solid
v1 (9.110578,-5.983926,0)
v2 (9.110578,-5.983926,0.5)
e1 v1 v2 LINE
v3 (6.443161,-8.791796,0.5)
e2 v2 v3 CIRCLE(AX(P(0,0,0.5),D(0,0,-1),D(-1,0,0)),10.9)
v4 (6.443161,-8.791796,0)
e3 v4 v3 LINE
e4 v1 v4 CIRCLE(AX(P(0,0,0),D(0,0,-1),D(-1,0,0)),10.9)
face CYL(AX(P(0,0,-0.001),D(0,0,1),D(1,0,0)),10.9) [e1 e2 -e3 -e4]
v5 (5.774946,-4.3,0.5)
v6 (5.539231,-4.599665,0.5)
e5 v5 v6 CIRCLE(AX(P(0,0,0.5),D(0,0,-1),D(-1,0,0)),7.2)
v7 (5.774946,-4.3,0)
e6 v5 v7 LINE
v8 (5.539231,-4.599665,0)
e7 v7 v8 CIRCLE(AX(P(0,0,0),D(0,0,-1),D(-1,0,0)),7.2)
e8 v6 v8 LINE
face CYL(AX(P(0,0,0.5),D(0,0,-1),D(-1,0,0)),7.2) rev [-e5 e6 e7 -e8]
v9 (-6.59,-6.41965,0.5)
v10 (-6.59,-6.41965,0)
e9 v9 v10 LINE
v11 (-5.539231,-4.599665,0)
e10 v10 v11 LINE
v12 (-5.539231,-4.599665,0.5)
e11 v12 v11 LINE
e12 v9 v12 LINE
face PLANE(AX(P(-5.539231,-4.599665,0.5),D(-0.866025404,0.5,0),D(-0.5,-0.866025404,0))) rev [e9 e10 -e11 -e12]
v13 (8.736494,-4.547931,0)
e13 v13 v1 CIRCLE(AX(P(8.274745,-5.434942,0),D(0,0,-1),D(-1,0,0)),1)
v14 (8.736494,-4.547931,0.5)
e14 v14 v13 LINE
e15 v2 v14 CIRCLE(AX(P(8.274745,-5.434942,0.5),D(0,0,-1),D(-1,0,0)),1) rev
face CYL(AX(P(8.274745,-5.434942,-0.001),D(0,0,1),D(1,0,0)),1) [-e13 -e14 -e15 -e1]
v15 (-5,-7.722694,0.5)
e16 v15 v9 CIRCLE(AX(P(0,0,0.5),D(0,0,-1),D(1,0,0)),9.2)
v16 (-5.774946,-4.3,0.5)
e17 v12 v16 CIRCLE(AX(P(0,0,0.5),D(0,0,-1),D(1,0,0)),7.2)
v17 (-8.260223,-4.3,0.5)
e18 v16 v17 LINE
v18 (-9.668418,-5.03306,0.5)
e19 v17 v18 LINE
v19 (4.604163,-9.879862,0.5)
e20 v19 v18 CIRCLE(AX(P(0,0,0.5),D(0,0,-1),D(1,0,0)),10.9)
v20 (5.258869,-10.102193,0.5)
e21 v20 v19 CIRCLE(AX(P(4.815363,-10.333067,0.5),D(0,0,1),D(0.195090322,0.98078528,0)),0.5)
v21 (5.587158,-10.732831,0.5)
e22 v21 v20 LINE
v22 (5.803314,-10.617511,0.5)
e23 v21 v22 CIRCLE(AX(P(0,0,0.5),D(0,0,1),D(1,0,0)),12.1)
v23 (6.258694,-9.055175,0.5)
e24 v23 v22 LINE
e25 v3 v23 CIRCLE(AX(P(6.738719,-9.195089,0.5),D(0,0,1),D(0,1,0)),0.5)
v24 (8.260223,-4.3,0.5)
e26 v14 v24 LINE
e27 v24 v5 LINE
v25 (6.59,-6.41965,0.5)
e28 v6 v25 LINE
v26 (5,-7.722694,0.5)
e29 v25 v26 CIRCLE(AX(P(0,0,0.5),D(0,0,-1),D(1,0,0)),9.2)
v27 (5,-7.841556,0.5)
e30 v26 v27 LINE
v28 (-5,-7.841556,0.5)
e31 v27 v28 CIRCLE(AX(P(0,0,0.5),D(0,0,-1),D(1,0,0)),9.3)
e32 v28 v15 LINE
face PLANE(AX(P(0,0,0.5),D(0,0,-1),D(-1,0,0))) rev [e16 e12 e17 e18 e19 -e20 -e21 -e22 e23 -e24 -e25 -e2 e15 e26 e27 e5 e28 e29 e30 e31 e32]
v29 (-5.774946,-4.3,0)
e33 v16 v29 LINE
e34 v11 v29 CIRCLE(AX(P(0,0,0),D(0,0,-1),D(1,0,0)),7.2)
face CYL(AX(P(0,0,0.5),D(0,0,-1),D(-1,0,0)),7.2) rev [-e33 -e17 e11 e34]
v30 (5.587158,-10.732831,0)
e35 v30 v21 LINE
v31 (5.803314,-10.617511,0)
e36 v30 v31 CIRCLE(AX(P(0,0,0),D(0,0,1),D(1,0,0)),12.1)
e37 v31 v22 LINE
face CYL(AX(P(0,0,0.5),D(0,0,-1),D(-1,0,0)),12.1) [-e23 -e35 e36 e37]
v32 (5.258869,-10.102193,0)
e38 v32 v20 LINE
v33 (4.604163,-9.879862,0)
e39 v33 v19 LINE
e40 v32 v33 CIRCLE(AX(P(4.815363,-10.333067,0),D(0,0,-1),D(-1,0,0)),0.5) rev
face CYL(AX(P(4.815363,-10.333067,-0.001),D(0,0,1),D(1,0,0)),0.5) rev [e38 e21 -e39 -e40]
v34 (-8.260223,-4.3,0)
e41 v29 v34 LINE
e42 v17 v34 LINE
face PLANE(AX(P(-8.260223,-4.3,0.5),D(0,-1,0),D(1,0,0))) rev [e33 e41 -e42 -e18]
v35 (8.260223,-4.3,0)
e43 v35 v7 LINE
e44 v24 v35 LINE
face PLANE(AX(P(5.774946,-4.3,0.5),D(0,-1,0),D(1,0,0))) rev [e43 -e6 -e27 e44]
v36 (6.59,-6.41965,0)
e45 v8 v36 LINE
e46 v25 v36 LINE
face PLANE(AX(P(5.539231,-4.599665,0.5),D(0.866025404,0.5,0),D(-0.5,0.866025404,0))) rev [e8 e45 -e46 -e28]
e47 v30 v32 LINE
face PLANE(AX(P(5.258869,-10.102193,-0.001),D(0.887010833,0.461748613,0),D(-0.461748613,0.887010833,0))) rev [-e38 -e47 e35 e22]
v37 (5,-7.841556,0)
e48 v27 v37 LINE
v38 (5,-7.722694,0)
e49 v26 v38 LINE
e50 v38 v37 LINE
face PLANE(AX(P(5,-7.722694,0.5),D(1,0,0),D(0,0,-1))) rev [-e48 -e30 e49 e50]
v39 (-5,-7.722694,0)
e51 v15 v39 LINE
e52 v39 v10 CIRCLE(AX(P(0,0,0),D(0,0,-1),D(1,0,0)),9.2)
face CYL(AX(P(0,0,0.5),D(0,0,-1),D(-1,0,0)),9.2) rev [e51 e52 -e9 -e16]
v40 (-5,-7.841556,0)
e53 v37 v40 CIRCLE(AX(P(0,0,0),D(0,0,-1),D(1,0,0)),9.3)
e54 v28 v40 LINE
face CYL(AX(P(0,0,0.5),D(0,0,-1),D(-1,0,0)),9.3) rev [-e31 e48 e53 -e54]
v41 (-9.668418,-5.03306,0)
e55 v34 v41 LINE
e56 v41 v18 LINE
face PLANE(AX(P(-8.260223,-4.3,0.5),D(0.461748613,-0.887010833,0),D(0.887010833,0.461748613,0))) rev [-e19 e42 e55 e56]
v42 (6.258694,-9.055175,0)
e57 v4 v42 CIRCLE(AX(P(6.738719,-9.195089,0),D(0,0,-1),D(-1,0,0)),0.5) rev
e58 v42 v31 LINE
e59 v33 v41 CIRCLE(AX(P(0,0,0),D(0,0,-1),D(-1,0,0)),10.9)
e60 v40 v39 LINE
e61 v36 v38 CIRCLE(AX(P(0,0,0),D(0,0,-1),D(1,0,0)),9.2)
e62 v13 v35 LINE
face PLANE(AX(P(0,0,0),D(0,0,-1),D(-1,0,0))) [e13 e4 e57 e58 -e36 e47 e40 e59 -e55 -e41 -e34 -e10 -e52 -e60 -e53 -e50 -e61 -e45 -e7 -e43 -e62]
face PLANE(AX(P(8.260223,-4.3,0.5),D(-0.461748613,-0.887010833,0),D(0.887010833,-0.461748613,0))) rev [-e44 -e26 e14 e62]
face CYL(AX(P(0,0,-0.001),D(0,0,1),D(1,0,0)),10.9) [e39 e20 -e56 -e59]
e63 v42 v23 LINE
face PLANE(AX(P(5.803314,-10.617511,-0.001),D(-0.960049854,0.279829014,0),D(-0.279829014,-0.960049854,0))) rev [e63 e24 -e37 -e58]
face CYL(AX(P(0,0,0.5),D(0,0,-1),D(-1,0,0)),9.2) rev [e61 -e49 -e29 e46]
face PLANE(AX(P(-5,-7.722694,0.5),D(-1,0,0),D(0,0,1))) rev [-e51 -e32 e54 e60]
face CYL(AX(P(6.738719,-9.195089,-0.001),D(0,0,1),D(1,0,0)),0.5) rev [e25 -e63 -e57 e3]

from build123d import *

# Parameters (mm, degrees)
OTHER_10076_5_DEPTH = 0.5
CUT_EXTRUDE1_START  = -0.5
CUT_EXTRUDE1_DEPTH  = 0.5


# Read off the part's stored shape, not the designer's step: 10076-5
with BuildPart() as part:
    # Other 10076-5 outline → Other 10076-5 (new body)
    with BuildSketch(Plane.XY):
        with BuildLine():
            ThreePointArc((7.573674013, -9.436602245), (7.668819519, -9.359444812), (7.763179028, -9.281328104))
            Line((7.763179028, -9.281328104), (7.919995926, -7.488902759))
            ThreePointArc((7.919995926, -7.488902759), (8.548470738, -6.76266575), (9.110578105, -5.983925684))
            ThreePointArc((9.110578105, -5.983925684), (9.242448569, -5.182849851), (8.736493865, -4.547930843))
            Line((8.736493865, -4.547930843), (8.260223146, -4.3))
            Line((8.260223146, -4.3), (5.774945887, -4.3))
            ThreePointArc((5.774945887, -4.3), (5.659072475, -4.451392897), (5.53923133, -4.5996648))
            Line((5.53923133, -4.5996648), (6.59, -6.419649523))
            ThreePointArc((6.59, -6.419649523), (5.831509763, -7.1157216), (5, -7.722693831))
            Line((5, -7.722693831), (5, -7.841555968))
            ThreePointArc((5, -7.841555968), (0, -9.3), (-5, -7.841555968))
            Line((-5, -7.841555968), (-5, -7.722693831))
            ThreePointArc((-5, -7.722693831), (-5.831509763, -7.1157216), (-6.59, -6.419649523))
            Line((-6.59, -6.419649523), (-5.53923133, -4.5996648))
            ThreePointArc((-5.53923133, -4.5996648), (-5.659072475, -4.451392897), (-5.774945887, -4.3))
            Line((-5.774945887, -4.3), (-8.260223146, -4.3))
            Line((-8.260223146, -4.3), (-10.732831081, -5.58715822))
            ThreePointArc((-10.732831081, -5.58715822), (-10.675718173, -5.6955282), (-10.617511084, -5.803314431))
            Line((-10.617511084, -5.803314431), (-9.055174855, -6.258693914))
            ThreePointArc((-9.055174855, -6.258693914), (-8.704696722, -6.64117368), (-8.882127626, -7.128661083))
            Line((-8.882127626, -7.128661083), (-9.436602245, -7.573674013))
            ThreePointArc((-9.436602245, -7.573674013), (-9.359444812, -7.668819519), (-9.281328104, -7.763179028))
            Line((-9.281328104, -7.763179028), (-7.660171598, -7.905011844))
            ThreePointArc((-7.660171598, -7.905011844), (-7.241809703, -8.211767477), (-7.320727248, -8.724502998))
            Line((-7.320727248, -8.724502998), (-7.777730077, -9.269137762))
            ThreePointArc((-7.777730077, -9.269137762), (-7.683493234, -9.347402405), (-7.588468891, -9.424709008))
            Line((-7.588468891, -9.424709008), (-5.970792243, -9.247544602))
            ThreePointArc((-5.970792243, -9.247544602), (-5.500623999, -9.466787654), (-5.477995427, -9.985067155))
            Line((-5.477995427, -9.985067155), (-5.819964104, -10.608393744))
            ThreePointArc((-5.819964104, -10.608393744), (-5.712269322, -10.666769858), (-5.603989074, -10.724052707))
            Line((-5.603989074, -10.724052707), (-4.05195869, -10.234699407))
            ThreePointArc((-4.05195869, -10.234699407), (-3.548052399, -10.358004491), (-3.424747314, -10.861910782))
            Line((-3.424747314, -10.861910782), (-3.638540174, -11.539975104))
            ThreePointArc((-3.638540174, -11.539975104), (-3.521526102, -11.576219327), (-3.404151099, -11.611277074))
            Line((-3.404151099, -11.611277074), (-1.977410637, -10.828540453))
            ThreePointArc((-1.977410637, -10.828540453), (-1.459131136, -10.851169025), (-1.239888083, -11.321337268))
            Line((-1.239888083, -11.321337268), (-1.317289186, -12.028081692))
            ThreePointArc((-1.317289186, -12.028081692), (-1.195452609, -12.04080118), (-1.073493507, -12.052286575))
            Line((-1.073493507, -12.052286575), (0.173128198, -11.006246762))
            ThreePointArc((0.173128198, -11.006246762), (0.685863719, -10.927329218), (0.992619352, -11.345691113))
            Line((0.992619352, -11.345691113), (1.054584487, -12.053955847))
            ThreePointArc((1.054584487, -12.053955847), (1.176561457, -12.042661796), (1.298417839, -12.030133462))
            Line((1.298417839, -12.030133462), (2.317013814, -10.760989181))
            ThreePointArc((2.317013814, -10.760989181), (2.804501216, -10.583558277), (3.186980982, -10.93403641))
            Line((3.186980982, -10.93403641), (3.38593107, -11.616603238))
            ThreePointArc((3.38593107, -11.616603238), (3.503360927, -11.581729673), (3.620431715, -11.545669067))
            Line((3.620431715, -11.545669067), (4.371857887, -10.10219282))
            ThreePointArc((4.371857887, -10.10219282), (4.815363304, -9.833067127), (5.258868721, -10.10219282))
            Line((5.258868721, -10.10219282), (5.58715822, -10.732831081))
            ThreePointArc((5.58715822, -10.732831081), (5.6955282, -10.675718173), (5.803314431, -10.617511084))
            Line((5.803314431, -10.617511084), (6.258693914, -9.055174855))
            ThreePointArc((6.258693914, -9.055174855), (6.64117368, -8.704696722), (7.128661083, -8.882127626))
            Line((7.128661083, -8.882127626), (7.573674013, -9.436602245))
        make_face()
    extrude(amount=OTHER_10076_5_DEPTH)

    # Sketch1 → Cut-Extrude1 (cut)
    with BuildSketch(Plane.XY.offset(0.5).offset(CUT_EXTRUDE1_START)):
        with BuildLine():
            Line((-9.668418082, -5.033059884), (-10.732831081, -5.58715822))
            ThreePointArc((-10.732831081, -5.58715822), (-4.639236905, -11.175306749), (3.620431715, -11.545669067))
            Line((3.620431715, -11.545669067), (4.371857887, -10.10219282))
            ThreePointArc((4.371857887, -10.10219282), (4.469650209, -9.971843573), (4.604163159, -9.879862428))
            ThreePointArc((4.604163159, -9.879862428), (-3.50493127, -10.321117032), (-9.668418082, -5.033059884))
        make_face()
        with BuildLine():
            Line((7.573674013, -9.436602245), (7.128661083, -8.882127626))
            ThreePointArc((7.128661083, -8.882127626), (6.804041546, -8.699374782), (6.443160998, -8.791795969))
            ThreePointArc((6.443160998, -8.791795969), (7.211064546, -8.173771964), (7.919995926, -7.488902759))
            Line((7.919995926, -7.488902759), (7.763179028, -9.281328104))
            ThreePointArc((7.763179028, -9.281328104), (7.668819519, -9.359444812), (7.573674013, -9.436602245))
        make_face()
    extrude(amount=CUT_EXTRUDE1_DEPTH, mode=Mode.SUBTRACT)


solid = part.part
